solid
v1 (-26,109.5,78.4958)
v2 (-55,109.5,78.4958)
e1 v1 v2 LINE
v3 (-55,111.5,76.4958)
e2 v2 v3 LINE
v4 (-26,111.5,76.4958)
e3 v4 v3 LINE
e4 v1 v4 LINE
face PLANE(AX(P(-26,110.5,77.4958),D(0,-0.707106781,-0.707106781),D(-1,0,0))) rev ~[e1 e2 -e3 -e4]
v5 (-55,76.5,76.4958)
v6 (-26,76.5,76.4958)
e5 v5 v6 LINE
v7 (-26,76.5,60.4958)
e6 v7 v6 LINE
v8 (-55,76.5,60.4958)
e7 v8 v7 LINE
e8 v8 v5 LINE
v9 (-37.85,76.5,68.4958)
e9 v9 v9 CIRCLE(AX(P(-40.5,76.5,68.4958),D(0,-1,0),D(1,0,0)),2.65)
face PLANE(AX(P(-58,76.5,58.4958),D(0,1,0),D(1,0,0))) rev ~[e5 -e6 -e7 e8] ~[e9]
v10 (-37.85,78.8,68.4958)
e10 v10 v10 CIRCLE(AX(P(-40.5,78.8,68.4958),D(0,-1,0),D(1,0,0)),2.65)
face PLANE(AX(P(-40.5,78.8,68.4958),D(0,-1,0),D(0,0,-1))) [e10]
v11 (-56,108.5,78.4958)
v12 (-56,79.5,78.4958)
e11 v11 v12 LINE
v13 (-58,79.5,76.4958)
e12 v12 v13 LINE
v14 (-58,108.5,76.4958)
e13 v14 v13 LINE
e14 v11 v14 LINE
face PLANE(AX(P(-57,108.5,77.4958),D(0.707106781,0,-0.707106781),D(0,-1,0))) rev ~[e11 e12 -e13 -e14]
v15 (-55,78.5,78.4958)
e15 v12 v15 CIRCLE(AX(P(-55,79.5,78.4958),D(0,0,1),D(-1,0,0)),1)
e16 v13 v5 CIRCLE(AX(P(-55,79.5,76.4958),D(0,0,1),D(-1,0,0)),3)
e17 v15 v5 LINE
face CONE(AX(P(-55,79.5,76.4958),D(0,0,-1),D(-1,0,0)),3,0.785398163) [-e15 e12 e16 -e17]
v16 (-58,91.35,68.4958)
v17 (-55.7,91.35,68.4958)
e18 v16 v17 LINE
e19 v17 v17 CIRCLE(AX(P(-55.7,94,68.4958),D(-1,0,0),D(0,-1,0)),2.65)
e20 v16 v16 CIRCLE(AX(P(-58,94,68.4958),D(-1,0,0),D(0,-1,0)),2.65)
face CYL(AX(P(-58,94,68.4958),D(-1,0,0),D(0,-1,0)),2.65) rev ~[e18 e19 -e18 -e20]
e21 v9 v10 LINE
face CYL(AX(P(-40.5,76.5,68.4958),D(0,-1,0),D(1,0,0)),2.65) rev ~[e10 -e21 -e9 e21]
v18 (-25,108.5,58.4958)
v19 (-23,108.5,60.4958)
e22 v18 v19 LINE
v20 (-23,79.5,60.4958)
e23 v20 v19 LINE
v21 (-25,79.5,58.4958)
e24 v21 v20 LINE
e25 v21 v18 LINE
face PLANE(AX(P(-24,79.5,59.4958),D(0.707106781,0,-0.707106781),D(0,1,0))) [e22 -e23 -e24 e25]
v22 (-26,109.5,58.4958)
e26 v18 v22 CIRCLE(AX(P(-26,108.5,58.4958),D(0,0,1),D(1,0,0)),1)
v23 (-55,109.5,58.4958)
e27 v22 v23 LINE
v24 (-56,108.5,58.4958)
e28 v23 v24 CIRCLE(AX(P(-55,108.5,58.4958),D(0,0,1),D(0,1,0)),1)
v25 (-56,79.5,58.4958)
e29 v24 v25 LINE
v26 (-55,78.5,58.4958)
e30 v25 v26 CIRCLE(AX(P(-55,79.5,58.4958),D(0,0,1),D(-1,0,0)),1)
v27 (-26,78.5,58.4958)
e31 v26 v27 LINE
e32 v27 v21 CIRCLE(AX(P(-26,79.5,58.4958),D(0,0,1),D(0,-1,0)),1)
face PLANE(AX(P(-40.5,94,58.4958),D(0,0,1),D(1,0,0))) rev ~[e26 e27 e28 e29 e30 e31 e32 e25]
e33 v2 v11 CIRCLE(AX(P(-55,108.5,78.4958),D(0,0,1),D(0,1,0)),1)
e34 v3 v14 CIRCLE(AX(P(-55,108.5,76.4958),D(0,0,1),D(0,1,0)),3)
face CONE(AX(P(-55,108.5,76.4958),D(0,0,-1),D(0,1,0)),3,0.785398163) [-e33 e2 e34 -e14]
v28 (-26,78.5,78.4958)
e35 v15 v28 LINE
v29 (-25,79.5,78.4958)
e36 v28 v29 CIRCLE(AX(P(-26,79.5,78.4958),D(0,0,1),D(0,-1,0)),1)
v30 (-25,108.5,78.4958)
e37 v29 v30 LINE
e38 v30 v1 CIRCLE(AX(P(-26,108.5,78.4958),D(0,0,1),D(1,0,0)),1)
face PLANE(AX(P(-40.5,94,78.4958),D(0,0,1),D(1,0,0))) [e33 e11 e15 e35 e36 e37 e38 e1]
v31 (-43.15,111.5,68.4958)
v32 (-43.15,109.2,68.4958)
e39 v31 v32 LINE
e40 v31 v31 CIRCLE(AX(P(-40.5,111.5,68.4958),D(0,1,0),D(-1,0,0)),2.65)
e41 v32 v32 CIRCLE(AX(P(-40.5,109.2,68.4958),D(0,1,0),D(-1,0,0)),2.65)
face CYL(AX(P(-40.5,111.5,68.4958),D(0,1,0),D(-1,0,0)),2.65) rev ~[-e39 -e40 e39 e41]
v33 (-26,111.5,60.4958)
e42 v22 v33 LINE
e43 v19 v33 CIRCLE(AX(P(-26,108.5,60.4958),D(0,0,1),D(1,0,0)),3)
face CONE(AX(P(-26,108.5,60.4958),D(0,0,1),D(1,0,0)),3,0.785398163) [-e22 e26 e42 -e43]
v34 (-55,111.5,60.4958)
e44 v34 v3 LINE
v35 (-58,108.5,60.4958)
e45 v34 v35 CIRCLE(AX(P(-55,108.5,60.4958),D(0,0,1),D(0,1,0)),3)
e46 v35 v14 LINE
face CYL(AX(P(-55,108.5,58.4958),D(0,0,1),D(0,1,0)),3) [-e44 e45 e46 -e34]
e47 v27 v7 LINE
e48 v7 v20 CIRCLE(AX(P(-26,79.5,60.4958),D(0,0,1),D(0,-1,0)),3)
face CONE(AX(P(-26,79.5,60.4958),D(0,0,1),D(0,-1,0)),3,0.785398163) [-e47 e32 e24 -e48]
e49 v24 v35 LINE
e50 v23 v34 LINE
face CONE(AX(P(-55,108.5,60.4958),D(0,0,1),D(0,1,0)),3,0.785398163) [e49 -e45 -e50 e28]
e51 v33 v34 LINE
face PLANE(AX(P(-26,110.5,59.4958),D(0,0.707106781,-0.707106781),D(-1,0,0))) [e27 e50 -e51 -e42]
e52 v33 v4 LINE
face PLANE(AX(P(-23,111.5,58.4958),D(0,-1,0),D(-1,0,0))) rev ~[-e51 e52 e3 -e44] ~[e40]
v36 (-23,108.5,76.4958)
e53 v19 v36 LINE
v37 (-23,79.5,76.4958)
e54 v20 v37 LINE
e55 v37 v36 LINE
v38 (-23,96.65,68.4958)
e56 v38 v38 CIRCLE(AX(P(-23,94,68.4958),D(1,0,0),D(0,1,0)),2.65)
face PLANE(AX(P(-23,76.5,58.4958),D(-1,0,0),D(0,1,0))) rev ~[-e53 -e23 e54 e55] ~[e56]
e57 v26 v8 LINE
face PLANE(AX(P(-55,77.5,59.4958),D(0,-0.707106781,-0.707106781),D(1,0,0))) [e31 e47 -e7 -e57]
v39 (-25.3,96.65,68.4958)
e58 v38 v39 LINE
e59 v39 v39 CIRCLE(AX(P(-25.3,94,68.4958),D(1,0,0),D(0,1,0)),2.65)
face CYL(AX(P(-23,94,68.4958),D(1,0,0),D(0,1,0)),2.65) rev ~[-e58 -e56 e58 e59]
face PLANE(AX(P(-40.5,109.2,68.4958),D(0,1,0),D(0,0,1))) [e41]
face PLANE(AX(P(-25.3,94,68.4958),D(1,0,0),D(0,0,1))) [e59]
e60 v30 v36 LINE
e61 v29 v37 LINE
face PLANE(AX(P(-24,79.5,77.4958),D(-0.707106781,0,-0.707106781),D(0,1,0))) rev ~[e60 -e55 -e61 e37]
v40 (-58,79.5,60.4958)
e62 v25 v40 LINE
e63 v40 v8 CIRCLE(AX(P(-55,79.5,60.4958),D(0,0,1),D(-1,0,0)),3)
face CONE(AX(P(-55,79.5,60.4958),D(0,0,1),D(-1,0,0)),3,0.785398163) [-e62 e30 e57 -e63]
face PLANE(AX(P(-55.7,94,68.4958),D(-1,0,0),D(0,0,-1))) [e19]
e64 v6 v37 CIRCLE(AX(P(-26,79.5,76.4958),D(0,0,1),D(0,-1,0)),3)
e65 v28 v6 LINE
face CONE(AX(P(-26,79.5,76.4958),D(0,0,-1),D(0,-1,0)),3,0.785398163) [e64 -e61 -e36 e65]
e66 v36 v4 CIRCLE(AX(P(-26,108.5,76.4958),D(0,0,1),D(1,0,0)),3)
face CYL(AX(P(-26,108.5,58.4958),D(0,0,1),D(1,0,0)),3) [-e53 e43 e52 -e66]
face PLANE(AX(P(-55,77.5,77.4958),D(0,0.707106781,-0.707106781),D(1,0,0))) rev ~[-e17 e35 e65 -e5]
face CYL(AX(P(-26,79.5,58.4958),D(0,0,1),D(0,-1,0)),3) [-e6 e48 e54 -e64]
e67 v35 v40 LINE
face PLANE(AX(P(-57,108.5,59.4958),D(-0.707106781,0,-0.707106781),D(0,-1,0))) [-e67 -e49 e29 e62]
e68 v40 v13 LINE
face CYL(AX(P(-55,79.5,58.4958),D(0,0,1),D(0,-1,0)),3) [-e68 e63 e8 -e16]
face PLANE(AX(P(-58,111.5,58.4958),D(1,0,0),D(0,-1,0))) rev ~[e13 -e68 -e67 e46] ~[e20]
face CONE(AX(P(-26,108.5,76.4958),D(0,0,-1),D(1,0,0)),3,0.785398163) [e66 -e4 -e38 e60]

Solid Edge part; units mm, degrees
sketch "Sketch1" plane through (0, 0, 58.4958) normal (0, 0, 1) x (1, 0, 0)
  line L0 (-58, 76.5) -> (-23, 76.5)
  line L1 (-23, 76.5) -> (-23, 111.5)
  line L2 (-23, 111.5) -> (-58, 111.5)
  line L3 (-58, 111.5) -> (-58, 76.5)
extrude "Protrusion1" add sketch "Sketch1" along normal blind 20
fillet "Round_1" radius 3 4 edges at (-23, 111.5, 68.4958) (-58, 111.5, 68.4958) (-58, 76.5, 68.4958) (-23, 76.5, 68.4958)
chamfer "Chamfer_3" distance 2 angle 45 15 edges at (-58, 94, 78.4958) (-57.1213, 77.3787, 78.4958) (-40.5, 76.5, 78.4958) (-23.8787, 77.3787, 78.4958) (-23, 94, 78.4958) (-23.8787, 110.6213, 78.4958) (-40.5, 111.5, 78.4958) (-57.1213, 110.6213, 78.4958) (-58, 94, 58.4958) (-57.1213, 77.3787, 58.4958) (-40.5, 76.5, 58.4958) (-23.8787, 77.3787, 58.4958) (-23, 94, 58.4958) (-40.5, 111.5, 58.4958) (-57.1213, 110.6213, 58.4958)
sketch "Sketch2" plane through (-40.5, 76.5, 65.9958) normal (0, -1, 0) x (1, 0, 0)
  circle A0 centre (0, 2.5) radius 2.65
extrude "ExtrudedCutout_1" cut sketch "Sketch2" against normal blind 2.3
sketch "Sketch3" plane through (-40.5, 111.5, 65.9958) normal (0, 1, 0) x (-1, 0, 0)
  circle A0 centre (0, 2.5) radius 2.65
extrude "ExtrudedCutout_4" cut sketch "Sketch3" against normal blind 2.3
sketch "Sketch4" plane through (-58, 94, 65.9958) normal (-1, 0, 0) x (0, -1, 0)
  circle A0 centre (0, 2.5) radius 2.65
extrude "ExtrudedCutout_5" cut sketch "Sketch4" against normal blind 2.3
sketch "Sketch5" plane through (-23, 94, 65.9958) normal (1, 0, 0) x (0, 1, 0)
  circle A0 centre (0, 2.5) radius 2.65
extrude "ExtrudedCutout_6" cut sketch "Sketch5" against normal blind 2.3
